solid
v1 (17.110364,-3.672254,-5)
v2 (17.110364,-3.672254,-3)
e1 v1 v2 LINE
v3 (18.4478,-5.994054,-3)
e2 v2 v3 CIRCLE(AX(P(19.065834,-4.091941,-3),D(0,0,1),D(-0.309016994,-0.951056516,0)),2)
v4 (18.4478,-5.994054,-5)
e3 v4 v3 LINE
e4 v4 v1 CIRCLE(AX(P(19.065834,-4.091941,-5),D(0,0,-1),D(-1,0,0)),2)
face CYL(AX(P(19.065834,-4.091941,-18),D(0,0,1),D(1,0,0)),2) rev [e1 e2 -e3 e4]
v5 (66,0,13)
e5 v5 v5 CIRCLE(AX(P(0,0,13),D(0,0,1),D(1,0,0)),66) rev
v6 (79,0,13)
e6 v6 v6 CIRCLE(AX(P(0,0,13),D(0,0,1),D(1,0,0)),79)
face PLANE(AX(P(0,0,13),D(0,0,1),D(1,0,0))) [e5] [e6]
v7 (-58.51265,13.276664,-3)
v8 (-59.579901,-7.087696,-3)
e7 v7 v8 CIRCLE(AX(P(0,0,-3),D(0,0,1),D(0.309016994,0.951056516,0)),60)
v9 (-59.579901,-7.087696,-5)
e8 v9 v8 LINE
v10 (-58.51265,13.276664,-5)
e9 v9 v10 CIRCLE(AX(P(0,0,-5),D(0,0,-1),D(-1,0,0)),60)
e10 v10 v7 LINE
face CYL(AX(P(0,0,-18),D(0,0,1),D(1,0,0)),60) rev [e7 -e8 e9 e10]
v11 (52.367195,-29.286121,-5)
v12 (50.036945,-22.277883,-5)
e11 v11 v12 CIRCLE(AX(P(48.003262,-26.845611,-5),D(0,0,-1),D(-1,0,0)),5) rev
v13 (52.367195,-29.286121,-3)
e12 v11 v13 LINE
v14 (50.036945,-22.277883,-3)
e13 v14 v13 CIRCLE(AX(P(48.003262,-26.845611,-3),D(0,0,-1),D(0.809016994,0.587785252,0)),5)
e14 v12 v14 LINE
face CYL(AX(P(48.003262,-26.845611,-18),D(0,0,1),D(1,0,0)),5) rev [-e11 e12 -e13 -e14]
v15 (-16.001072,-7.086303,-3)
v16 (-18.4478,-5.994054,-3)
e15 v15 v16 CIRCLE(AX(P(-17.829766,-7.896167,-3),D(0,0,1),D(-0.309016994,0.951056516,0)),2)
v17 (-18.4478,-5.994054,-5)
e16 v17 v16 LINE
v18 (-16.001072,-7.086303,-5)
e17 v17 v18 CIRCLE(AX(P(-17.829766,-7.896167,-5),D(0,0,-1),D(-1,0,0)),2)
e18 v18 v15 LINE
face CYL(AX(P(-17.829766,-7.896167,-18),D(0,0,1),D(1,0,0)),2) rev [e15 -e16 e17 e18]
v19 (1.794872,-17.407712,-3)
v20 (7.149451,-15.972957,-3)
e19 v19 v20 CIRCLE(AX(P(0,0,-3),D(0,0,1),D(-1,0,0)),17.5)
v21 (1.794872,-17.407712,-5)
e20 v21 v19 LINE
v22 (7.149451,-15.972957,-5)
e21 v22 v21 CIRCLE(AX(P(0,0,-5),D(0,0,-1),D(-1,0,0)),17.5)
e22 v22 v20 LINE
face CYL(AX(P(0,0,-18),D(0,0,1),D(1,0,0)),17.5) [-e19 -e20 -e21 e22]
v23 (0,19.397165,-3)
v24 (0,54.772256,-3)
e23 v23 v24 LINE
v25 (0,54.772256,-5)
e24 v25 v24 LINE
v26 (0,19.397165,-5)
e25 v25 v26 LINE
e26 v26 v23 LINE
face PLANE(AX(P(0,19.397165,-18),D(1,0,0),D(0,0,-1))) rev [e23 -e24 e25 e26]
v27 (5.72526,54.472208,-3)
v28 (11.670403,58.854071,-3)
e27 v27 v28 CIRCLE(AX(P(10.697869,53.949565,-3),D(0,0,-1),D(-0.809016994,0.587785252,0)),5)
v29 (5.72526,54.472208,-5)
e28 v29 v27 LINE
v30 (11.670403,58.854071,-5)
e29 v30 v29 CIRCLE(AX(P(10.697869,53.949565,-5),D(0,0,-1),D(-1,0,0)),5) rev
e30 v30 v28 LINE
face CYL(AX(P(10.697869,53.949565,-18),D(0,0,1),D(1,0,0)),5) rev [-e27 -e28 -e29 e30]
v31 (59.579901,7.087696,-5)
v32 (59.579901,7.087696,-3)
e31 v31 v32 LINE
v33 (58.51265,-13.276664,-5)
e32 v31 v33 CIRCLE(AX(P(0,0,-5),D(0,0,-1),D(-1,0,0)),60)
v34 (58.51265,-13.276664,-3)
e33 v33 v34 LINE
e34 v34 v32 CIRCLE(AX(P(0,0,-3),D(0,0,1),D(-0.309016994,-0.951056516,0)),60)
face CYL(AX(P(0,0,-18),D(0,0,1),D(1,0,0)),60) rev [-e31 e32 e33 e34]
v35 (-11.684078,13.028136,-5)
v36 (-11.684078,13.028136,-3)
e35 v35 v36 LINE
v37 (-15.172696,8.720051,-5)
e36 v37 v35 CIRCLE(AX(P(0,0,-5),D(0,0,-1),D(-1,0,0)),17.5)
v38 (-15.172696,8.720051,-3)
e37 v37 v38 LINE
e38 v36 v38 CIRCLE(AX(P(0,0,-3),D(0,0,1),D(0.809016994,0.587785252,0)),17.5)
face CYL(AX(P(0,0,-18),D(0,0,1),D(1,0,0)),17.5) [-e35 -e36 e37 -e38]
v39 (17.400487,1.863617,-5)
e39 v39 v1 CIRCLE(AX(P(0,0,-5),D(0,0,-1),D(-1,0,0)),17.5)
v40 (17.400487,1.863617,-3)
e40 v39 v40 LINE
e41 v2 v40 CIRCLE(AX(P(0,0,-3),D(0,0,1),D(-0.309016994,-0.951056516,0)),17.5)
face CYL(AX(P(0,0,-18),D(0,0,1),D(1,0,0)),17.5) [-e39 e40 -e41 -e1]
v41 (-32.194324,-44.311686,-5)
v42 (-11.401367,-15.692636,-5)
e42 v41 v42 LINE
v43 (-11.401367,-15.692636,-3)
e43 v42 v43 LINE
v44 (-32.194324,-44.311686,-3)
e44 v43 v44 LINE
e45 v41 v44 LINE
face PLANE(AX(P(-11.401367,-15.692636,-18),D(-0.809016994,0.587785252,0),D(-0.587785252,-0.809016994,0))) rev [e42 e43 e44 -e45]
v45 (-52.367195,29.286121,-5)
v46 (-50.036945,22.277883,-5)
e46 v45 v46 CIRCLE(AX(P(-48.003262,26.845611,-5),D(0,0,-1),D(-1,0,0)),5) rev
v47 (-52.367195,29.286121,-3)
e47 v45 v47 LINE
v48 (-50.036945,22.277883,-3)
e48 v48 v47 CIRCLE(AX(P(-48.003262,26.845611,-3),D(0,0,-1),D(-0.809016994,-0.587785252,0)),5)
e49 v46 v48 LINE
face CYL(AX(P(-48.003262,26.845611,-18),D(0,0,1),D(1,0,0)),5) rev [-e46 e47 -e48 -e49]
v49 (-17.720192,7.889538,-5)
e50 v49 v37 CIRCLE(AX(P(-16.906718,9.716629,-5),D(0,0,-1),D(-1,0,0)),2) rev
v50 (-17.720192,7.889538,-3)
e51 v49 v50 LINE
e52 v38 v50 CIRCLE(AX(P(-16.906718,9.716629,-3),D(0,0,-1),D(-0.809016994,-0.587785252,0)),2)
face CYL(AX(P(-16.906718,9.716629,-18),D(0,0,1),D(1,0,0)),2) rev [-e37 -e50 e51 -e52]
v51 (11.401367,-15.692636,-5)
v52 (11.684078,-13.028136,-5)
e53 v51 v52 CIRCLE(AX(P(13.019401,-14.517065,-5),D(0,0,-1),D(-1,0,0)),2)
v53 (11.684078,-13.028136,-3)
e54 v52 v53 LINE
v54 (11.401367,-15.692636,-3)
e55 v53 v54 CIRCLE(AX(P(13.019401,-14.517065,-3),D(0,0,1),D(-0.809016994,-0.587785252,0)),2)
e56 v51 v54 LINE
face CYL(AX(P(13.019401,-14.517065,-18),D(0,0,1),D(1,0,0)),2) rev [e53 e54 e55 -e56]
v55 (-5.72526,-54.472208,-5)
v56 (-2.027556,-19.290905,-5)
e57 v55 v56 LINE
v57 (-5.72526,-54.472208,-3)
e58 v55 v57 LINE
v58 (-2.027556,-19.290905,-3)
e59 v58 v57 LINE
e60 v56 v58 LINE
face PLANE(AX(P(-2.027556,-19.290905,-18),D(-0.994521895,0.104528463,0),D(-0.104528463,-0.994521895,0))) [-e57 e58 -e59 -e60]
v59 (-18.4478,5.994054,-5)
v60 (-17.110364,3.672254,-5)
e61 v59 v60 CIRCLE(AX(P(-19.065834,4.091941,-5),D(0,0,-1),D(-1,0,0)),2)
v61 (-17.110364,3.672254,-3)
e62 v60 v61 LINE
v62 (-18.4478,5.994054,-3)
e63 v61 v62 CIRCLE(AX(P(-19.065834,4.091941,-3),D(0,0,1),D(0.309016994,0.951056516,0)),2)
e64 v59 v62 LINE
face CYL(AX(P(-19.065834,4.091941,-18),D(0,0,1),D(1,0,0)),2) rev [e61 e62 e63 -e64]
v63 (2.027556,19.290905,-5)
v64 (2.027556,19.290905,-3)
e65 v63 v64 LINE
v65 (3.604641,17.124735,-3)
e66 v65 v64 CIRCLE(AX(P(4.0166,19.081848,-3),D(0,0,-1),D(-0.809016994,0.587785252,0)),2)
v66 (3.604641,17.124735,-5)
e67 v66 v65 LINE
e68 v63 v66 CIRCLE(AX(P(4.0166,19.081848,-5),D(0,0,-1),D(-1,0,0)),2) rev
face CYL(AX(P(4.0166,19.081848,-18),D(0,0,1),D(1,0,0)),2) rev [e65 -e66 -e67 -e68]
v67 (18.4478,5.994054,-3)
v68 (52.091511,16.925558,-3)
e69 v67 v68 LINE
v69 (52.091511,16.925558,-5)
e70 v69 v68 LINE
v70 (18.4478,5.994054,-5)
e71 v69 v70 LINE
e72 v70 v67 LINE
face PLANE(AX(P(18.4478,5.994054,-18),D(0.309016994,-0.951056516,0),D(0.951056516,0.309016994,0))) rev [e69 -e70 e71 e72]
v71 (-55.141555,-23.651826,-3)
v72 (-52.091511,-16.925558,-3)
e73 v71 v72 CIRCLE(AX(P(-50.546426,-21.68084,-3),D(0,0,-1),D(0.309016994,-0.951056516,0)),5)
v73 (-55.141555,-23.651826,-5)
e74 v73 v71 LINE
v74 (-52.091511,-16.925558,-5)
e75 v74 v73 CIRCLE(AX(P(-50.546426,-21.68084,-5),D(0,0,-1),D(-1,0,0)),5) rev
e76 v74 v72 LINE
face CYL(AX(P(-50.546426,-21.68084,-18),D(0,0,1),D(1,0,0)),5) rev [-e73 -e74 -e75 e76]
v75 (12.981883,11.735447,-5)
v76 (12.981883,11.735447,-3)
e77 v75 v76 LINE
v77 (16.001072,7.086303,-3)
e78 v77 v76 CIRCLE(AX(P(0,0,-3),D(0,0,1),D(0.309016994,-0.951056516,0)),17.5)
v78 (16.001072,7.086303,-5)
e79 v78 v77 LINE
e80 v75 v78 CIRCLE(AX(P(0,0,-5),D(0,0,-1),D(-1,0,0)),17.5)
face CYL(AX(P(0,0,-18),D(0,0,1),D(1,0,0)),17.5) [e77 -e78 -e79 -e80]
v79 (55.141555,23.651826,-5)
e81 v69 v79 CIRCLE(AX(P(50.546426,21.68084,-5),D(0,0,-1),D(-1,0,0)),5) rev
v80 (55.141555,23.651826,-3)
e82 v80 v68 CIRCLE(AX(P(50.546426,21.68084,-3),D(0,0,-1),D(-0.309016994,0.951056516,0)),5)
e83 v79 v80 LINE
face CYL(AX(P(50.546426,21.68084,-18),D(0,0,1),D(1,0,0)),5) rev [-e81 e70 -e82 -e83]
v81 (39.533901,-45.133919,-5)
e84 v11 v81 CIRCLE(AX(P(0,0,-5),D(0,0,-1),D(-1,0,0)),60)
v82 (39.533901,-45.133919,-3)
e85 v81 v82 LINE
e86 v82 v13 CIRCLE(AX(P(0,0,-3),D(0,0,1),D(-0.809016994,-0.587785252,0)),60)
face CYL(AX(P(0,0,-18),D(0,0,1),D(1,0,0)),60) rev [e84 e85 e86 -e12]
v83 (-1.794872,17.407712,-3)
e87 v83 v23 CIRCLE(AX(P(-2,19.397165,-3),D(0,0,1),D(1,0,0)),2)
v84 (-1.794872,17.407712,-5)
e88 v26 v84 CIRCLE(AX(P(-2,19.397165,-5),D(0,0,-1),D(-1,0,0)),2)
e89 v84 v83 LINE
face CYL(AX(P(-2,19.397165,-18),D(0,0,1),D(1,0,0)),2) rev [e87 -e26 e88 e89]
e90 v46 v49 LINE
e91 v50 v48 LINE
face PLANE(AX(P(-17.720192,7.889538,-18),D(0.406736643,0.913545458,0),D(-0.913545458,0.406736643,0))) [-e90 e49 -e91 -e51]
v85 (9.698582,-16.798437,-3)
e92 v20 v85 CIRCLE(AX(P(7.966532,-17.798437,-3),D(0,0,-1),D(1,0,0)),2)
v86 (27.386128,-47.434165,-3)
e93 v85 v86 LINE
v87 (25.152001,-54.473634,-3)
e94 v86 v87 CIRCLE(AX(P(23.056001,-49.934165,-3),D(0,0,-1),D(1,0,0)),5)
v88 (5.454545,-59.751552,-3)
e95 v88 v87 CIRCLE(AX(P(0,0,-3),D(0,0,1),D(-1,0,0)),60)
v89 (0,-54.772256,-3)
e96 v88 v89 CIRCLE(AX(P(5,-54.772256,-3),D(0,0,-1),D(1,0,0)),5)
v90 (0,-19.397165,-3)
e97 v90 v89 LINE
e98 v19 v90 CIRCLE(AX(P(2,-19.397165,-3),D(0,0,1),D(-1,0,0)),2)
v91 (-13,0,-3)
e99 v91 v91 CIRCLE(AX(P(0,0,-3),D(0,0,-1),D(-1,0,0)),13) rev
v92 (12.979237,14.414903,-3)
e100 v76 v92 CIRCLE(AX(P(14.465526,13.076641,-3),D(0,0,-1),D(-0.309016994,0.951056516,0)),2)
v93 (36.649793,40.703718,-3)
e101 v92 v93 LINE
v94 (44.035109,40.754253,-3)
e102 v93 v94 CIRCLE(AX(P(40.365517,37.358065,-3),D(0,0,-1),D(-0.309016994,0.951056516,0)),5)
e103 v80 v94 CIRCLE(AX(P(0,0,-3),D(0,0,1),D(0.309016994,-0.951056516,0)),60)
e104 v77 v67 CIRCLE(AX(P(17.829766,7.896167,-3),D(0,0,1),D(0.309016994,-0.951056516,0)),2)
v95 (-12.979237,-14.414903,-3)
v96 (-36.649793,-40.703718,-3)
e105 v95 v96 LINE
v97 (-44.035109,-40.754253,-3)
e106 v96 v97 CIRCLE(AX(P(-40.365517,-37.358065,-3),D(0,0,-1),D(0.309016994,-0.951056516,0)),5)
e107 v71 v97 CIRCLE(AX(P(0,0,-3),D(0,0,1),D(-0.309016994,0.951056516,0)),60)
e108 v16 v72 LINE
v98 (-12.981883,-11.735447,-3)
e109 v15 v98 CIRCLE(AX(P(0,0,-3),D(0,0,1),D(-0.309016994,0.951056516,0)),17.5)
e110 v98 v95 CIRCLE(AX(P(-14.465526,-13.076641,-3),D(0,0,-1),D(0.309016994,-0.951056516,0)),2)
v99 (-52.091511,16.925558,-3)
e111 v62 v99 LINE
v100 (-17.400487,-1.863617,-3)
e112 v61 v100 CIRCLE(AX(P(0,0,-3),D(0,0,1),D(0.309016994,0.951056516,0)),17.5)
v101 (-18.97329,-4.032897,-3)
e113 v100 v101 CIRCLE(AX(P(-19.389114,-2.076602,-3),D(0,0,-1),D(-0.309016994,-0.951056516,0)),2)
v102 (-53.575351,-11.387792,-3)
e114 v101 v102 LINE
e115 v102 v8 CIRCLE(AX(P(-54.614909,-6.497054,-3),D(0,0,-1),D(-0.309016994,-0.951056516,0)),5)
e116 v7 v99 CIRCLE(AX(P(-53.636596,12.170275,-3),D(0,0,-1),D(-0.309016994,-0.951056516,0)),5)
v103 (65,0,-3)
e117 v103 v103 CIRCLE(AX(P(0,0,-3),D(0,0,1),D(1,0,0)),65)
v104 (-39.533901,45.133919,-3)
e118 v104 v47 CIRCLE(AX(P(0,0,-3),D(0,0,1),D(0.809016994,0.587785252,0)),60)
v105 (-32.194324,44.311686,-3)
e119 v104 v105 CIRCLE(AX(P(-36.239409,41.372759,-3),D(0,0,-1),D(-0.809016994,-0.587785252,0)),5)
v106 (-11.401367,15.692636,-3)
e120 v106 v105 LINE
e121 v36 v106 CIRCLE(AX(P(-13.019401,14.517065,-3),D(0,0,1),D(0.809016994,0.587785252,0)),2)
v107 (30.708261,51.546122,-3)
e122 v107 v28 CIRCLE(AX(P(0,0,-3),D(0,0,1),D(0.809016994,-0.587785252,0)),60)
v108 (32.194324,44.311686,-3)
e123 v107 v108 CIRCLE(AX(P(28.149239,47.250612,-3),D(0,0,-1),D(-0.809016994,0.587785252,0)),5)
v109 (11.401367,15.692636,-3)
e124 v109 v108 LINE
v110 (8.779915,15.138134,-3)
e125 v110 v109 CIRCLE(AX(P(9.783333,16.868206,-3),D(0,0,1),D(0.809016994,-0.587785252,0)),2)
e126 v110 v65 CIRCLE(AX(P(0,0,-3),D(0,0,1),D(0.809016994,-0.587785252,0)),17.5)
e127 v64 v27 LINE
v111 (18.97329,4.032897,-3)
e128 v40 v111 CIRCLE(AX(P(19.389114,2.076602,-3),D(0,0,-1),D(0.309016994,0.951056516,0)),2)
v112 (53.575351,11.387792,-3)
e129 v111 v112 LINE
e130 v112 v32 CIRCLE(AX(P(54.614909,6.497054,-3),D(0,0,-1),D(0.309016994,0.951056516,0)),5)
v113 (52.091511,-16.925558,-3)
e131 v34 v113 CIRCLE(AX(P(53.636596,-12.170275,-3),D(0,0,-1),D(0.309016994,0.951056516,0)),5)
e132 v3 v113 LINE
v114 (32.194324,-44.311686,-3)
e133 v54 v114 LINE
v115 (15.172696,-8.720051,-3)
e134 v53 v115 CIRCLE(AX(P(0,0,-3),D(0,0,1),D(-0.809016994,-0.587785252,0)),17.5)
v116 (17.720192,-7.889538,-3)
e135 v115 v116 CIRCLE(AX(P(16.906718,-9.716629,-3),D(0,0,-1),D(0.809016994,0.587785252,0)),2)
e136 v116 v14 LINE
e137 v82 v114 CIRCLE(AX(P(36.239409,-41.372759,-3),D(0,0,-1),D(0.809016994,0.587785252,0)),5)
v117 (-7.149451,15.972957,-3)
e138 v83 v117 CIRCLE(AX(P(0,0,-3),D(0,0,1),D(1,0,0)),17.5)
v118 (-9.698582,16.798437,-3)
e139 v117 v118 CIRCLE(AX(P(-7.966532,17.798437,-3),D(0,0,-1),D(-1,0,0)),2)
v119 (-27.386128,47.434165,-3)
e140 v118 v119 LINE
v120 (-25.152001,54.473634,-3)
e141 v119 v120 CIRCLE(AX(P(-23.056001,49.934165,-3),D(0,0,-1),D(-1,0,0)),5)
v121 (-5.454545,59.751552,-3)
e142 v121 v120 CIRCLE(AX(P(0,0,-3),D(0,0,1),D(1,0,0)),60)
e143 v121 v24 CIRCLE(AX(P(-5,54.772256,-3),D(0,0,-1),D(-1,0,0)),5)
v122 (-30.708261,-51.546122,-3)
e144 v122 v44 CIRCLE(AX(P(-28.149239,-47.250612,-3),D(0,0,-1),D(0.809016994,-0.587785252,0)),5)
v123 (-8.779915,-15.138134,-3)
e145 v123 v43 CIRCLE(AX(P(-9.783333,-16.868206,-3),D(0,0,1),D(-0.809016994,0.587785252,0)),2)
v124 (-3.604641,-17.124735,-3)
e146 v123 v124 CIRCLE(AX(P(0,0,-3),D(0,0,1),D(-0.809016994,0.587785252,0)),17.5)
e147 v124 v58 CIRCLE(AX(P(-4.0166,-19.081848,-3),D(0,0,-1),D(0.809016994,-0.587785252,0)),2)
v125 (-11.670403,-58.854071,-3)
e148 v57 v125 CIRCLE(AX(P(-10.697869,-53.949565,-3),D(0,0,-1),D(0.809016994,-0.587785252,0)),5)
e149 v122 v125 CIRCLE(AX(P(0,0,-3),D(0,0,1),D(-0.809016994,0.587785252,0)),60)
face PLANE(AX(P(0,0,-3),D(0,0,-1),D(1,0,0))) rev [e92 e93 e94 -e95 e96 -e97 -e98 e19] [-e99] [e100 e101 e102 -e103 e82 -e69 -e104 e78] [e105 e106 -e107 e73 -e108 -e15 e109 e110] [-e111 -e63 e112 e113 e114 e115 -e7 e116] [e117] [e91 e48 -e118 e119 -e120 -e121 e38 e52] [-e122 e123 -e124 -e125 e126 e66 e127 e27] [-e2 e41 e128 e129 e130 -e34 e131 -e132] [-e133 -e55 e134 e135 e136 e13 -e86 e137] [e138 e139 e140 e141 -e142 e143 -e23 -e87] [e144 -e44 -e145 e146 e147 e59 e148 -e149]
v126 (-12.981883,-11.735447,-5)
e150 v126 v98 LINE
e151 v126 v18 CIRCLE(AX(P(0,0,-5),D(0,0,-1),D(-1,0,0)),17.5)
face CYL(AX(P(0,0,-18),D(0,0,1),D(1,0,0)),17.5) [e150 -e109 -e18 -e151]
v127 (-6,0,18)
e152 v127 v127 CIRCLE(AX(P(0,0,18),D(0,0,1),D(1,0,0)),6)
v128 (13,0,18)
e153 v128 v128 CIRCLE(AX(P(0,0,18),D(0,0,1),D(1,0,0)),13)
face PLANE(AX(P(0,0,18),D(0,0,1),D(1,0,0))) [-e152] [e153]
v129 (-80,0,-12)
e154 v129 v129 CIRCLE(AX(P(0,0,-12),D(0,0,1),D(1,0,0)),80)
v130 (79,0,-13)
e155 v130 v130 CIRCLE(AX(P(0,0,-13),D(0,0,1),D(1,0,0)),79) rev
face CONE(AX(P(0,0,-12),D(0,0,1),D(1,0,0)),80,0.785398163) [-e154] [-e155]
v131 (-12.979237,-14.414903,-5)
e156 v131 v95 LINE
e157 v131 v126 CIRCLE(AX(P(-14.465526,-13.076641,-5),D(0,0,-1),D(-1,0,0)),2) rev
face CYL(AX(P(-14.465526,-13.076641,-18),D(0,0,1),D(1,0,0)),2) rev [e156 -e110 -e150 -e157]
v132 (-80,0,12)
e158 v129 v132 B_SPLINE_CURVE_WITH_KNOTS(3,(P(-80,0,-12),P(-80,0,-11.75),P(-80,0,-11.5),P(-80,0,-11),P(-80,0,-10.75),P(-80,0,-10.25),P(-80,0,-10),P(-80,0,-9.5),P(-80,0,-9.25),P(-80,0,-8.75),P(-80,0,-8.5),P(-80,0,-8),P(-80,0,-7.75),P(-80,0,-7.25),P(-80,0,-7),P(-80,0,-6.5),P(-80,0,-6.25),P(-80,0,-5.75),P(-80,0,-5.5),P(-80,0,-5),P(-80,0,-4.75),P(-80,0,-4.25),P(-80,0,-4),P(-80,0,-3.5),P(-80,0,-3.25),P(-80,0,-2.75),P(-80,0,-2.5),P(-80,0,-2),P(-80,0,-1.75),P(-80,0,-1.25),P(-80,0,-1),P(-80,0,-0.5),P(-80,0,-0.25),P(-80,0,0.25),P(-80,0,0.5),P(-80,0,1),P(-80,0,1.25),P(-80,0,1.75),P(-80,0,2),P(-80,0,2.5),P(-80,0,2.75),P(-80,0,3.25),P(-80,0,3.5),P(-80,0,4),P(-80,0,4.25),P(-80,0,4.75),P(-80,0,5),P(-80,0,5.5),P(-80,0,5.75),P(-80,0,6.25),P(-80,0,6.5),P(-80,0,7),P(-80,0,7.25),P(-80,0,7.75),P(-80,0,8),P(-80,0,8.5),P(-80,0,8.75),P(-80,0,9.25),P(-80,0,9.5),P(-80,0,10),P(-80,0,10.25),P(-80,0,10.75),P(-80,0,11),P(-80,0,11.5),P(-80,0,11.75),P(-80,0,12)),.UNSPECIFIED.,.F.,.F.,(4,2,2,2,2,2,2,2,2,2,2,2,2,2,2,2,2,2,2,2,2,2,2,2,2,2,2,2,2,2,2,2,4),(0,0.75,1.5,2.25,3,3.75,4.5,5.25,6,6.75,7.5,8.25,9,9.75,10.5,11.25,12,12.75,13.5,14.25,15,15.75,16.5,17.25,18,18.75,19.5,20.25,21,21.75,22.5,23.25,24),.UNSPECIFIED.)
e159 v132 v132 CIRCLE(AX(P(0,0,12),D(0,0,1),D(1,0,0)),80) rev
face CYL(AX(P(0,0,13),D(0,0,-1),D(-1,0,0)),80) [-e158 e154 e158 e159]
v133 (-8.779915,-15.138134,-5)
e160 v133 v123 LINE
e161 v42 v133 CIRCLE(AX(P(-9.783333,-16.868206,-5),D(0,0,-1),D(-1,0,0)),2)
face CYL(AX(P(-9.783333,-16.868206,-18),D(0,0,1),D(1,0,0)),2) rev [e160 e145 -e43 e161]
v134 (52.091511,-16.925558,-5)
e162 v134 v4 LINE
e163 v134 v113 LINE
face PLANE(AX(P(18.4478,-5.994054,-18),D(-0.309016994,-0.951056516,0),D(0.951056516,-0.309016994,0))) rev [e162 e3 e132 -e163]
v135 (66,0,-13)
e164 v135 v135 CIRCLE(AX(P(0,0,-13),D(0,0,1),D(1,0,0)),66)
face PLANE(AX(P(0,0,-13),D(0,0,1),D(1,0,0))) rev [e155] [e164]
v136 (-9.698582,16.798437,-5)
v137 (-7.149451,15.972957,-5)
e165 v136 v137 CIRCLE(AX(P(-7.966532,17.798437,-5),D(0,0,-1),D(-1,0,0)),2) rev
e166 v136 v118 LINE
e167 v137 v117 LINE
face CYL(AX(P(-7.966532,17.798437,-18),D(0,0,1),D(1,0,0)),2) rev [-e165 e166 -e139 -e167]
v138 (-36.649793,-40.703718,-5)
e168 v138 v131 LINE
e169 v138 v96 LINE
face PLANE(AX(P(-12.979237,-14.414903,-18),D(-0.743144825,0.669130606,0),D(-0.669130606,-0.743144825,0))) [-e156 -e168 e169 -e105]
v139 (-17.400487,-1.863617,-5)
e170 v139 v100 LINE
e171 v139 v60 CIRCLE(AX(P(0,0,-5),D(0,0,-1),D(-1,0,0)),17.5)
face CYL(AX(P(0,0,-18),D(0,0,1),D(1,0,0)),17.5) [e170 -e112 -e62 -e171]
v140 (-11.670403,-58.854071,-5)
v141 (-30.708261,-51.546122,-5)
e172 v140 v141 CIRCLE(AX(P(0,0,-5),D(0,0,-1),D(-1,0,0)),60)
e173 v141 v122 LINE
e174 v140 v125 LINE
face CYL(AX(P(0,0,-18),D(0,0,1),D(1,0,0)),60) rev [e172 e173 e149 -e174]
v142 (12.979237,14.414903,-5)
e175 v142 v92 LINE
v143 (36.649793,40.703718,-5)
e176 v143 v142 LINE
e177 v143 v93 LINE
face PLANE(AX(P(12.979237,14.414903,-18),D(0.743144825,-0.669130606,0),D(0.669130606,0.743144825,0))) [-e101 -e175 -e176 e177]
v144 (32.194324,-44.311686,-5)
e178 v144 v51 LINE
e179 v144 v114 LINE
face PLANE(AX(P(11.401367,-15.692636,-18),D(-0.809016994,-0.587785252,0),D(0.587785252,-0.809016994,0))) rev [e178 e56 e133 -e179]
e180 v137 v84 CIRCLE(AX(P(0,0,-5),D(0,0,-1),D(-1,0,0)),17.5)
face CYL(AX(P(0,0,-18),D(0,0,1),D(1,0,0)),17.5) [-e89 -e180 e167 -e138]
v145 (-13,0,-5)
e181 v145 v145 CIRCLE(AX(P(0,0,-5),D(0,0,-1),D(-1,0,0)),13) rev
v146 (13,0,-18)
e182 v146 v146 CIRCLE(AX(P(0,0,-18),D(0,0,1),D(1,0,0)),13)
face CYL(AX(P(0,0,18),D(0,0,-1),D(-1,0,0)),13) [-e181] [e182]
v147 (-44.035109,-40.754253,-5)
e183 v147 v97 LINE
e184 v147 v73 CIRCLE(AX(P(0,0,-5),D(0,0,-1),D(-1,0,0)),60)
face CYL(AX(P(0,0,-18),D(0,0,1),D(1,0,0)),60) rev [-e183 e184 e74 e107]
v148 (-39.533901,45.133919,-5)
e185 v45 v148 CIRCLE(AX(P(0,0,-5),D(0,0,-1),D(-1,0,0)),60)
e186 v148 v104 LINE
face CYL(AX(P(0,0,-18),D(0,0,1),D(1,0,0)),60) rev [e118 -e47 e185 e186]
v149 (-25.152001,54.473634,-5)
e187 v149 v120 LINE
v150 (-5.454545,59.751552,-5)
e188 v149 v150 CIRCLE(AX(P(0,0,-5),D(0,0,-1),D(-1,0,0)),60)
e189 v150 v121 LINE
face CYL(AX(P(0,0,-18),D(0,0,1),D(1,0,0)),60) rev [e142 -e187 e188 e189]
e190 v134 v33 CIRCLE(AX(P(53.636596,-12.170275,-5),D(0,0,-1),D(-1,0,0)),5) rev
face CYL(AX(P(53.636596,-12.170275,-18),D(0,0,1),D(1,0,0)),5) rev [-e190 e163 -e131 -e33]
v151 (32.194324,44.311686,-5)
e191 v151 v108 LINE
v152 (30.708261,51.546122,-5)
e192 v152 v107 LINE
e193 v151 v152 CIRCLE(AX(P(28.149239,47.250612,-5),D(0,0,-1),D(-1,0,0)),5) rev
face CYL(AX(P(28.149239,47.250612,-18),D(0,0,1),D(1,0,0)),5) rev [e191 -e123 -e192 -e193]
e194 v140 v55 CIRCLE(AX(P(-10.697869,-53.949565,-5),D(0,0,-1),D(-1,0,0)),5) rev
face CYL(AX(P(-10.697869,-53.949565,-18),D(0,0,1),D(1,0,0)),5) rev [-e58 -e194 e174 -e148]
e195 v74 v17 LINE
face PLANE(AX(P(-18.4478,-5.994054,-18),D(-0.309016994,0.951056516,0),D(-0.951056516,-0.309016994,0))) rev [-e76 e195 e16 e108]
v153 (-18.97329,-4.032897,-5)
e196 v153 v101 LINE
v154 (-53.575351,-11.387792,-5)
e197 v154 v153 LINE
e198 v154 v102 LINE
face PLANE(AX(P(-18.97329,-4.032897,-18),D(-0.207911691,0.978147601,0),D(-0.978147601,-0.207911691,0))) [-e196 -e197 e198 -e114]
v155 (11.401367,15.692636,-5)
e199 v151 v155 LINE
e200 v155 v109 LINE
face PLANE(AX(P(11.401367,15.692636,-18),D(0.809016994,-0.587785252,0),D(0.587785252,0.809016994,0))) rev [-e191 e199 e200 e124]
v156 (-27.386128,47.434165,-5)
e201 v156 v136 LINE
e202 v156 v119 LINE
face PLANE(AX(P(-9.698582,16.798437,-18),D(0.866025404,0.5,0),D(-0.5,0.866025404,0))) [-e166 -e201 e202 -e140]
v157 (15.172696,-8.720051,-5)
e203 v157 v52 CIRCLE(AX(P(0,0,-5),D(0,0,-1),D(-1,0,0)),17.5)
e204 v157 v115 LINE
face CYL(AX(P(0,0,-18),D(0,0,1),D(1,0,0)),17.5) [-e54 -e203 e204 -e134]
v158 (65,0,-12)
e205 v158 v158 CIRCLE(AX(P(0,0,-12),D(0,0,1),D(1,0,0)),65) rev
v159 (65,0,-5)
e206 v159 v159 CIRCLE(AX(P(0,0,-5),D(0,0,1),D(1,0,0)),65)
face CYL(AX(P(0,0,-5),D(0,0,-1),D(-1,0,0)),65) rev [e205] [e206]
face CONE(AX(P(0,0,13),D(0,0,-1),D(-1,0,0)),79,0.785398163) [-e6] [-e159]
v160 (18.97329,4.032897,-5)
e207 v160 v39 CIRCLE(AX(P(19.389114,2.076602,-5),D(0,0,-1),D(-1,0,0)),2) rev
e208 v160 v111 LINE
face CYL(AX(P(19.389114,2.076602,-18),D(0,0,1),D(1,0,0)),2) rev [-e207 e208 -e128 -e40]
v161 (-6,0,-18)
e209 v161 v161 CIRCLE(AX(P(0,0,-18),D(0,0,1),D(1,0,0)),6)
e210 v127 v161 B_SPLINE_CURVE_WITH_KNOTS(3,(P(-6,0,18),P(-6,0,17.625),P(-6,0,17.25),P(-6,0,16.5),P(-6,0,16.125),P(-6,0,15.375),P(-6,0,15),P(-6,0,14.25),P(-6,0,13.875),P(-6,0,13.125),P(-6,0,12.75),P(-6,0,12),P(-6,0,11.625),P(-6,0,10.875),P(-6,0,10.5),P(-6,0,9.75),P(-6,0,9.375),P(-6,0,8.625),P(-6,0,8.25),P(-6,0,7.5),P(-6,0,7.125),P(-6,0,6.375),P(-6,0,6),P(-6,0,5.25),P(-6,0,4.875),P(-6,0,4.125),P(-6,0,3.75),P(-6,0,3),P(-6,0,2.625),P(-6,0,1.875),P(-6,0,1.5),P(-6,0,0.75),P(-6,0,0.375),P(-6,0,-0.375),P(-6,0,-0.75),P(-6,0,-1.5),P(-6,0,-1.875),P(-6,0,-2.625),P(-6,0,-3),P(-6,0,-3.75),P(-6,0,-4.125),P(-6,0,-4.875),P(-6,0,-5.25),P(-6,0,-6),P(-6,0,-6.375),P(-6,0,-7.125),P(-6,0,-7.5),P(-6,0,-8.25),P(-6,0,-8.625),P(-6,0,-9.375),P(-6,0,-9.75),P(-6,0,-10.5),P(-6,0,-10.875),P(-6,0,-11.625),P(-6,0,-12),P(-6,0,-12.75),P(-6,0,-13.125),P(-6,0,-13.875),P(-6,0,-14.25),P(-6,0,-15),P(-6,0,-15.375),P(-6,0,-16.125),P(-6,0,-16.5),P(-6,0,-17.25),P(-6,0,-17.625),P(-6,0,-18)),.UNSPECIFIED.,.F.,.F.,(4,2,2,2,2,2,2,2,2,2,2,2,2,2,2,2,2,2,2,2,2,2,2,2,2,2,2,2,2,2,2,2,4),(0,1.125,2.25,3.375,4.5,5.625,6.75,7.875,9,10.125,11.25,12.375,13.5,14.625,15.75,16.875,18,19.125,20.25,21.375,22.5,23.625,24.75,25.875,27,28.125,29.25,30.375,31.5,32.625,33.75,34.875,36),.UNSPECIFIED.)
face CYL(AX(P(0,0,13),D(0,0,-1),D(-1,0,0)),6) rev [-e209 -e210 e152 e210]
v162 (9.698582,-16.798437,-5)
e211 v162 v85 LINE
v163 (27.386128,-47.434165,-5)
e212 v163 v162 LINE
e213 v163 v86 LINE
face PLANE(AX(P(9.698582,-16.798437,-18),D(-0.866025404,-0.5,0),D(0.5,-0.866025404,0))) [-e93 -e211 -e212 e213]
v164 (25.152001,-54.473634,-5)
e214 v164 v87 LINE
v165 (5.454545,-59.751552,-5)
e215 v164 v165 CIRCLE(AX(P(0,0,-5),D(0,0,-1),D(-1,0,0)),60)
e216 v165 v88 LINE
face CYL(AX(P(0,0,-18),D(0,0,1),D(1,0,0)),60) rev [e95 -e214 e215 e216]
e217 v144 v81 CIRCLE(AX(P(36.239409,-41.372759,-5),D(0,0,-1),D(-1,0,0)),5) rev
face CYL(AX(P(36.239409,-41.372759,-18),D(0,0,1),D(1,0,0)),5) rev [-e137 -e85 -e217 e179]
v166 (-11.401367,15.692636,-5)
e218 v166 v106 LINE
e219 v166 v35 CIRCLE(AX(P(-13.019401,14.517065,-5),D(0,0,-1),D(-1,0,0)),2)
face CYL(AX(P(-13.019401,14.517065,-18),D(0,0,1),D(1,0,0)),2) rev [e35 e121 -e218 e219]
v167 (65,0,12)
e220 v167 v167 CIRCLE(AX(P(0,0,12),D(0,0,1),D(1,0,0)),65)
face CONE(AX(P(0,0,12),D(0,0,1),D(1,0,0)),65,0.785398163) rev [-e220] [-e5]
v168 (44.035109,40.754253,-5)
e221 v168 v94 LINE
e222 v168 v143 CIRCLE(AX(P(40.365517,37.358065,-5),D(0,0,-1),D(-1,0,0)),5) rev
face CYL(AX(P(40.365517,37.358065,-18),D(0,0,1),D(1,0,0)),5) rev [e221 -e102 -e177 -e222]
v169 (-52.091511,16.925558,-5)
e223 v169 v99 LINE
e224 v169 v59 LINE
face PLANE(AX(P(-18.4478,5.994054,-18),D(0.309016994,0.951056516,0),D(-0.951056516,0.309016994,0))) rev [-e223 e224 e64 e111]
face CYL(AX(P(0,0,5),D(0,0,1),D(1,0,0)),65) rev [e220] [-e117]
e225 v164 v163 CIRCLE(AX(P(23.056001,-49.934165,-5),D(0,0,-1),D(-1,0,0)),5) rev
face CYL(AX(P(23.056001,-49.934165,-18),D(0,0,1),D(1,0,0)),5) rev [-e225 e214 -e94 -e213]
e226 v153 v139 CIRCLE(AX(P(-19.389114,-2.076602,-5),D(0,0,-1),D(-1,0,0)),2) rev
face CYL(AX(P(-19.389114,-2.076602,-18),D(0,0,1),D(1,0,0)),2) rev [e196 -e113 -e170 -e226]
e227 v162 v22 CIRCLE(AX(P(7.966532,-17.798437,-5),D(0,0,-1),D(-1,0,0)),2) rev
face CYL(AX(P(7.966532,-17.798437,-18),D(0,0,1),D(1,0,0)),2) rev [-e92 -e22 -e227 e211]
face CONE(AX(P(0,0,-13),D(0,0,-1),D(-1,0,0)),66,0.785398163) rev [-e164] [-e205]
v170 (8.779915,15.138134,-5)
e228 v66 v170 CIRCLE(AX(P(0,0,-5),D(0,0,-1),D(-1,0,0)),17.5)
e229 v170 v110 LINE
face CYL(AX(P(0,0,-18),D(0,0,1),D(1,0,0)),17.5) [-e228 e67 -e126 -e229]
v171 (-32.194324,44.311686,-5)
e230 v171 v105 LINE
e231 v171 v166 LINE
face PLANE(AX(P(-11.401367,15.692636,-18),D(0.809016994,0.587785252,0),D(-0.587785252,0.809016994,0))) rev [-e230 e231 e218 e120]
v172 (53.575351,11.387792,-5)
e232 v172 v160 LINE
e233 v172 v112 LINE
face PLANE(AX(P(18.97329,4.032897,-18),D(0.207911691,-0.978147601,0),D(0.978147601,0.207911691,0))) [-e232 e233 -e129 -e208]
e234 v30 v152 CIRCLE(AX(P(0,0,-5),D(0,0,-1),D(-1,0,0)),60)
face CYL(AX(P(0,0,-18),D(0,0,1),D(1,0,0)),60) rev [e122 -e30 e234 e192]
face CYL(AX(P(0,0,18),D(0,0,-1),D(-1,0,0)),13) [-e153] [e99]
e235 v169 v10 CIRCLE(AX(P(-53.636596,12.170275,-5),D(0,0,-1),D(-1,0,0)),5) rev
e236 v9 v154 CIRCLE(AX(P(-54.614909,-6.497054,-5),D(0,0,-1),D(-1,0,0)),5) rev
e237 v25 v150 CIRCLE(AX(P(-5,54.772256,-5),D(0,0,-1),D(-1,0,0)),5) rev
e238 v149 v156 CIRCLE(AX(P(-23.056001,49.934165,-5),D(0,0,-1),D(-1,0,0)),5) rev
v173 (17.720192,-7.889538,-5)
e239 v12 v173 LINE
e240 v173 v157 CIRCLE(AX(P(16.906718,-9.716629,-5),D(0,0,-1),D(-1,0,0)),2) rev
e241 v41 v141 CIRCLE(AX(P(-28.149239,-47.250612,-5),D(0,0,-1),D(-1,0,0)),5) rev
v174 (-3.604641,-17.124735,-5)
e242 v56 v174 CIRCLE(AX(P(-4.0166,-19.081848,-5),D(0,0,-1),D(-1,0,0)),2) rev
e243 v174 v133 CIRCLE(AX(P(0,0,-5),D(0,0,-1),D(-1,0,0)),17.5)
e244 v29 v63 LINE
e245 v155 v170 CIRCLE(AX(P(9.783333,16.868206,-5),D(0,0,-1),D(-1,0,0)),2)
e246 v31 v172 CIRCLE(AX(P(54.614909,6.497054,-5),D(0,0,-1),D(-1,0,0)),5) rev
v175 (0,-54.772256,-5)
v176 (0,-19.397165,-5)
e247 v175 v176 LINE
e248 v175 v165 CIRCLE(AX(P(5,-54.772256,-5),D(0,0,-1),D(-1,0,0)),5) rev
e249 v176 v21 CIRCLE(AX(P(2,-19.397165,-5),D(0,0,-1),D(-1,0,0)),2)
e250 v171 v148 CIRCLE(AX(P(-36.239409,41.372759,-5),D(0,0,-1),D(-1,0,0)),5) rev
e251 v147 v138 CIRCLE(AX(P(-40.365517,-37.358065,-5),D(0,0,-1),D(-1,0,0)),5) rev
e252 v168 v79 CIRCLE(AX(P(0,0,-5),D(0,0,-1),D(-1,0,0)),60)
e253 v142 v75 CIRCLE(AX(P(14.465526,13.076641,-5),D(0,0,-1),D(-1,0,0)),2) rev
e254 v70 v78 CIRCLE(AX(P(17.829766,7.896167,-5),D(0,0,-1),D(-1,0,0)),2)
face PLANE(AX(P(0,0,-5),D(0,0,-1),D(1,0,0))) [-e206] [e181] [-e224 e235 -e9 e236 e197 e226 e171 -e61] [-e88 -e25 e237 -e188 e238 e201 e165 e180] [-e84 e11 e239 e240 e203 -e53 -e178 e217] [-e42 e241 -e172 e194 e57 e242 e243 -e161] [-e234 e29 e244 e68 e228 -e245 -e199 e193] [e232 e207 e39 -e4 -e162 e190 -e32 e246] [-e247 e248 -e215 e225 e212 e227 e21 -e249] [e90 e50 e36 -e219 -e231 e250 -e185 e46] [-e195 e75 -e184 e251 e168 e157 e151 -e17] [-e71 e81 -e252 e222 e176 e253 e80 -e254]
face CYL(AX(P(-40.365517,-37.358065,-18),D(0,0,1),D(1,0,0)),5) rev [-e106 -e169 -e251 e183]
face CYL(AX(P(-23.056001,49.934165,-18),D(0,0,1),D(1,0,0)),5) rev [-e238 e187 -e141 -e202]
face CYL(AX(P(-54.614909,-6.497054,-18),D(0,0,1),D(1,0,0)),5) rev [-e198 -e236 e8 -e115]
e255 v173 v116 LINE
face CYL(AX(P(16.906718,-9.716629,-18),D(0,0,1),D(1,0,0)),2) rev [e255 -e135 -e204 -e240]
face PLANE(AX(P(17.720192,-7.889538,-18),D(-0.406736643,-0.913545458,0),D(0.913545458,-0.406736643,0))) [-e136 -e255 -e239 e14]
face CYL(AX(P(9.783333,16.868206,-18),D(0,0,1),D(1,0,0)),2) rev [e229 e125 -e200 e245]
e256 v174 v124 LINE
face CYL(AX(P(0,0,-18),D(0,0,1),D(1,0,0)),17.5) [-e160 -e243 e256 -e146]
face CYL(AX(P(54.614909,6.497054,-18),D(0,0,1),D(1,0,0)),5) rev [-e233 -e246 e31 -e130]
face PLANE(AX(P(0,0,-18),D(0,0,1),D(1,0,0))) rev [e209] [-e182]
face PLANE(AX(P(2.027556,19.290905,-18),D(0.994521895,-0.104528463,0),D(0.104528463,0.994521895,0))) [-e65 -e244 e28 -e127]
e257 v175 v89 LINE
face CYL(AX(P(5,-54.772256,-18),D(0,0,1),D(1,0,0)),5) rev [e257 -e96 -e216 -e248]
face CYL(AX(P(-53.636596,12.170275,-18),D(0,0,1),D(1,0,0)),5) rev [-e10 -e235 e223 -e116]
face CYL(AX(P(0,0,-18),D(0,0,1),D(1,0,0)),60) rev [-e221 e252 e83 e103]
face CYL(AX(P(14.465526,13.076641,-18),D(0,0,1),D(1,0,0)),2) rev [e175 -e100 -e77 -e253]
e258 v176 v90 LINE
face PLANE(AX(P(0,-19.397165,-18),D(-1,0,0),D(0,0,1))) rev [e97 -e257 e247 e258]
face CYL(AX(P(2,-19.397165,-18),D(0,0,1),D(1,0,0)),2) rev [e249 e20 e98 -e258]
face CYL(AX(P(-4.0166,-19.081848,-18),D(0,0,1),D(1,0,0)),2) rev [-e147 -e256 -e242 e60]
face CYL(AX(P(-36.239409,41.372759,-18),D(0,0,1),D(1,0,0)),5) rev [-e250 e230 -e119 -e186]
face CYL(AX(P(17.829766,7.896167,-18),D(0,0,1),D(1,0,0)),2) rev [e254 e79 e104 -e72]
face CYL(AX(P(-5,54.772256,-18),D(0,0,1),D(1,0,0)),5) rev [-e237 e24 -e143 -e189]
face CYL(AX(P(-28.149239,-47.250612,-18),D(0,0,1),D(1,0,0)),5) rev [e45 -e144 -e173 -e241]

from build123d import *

# Parameters (mm, degrees)
SKETCH1_R             = 80
SKETCH1_R_2           = 6
BOSS_EXTRUDE1_DEPTH   = 13
SKETCH2_R             = 65
CUT_EXTRUDE1_DEPTH    = 8
MIRROR1_START         = -13
MIRROR1_OUTLINE_R     = 65
MIRROR1_OUTLINE_R_2   = 6
MIRROR1_DEPTH         = 8
MIRROR1_START_2       = -3
MIRROR1_2_OUTLINE_R   = 65
MIRROR1_2_OUTLINE_R_2 = 6
MIRROR1_2_DEPTH       = 8
SKETCH3_R             = 13
SKETCH3_R_2           = 6
BOSS_EXTRUDE2_DEPTH   = 18
CHAMFER1_SIZE         = 1
CUT_EXTRUDE2_DEPTH    = 116.06954419
CIRPATTERN1_COUNT     = 10


# Read off the part's stored shape, not the designer's step: Mirror1
with BuildPart() as part:
    # Sketch1 → Boss-Extrude1 (new, symmetric)
    with BuildSketch(Plane.XY):
        with Locations(Location((0, 0, 0), (0, 0, 180))):
            Circle(SKETCH1_R)
        with Locations(Location((0, 0, 0), (0, 0, 180))):
            Circle(SKETCH1_R_2, mode=Mode.SUBTRACT)
    extrude(amount=BOSS_EXTRUDE1_DEPTH, both=True)

    # Sketch2 → Cut-Extrude1 (cut)
    with BuildSketch(Plane.XY.offset(13)):
        Circle(SKETCH2_R)
    extrude(amount=-CUT_EXTRUDE1_DEPTH, mode=Mode.SUBTRACT)

    # Mirror1 outline → Mirror1 (cut)
    with BuildSketch(Plane.XY.offset(MIRROR1_START)):
        Circle(MIRROR1_OUTLINE_R)
        Circle(MIRROR1_OUTLINE_R_2, mode=Mode.SUBTRACT)
    extrude(amount=MIRROR1_DEPTH, mode=Mode.SUBTRACT)

    # Mirror1 2 outline → Mirror1 2 (cut)
    with BuildSketch(Plane.XY.offset(MIRROR1_START_2)):
        Circle(MIRROR1_2_OUTLINE_R)
        Circle(MIRROR1_2_OUTLINE_R_2, mode=Mode.SUBTRACT)
    extrude(amount=MIRROR1_2_DEPTH, mode=Mode.SUBTRACT)

    # Sketch3 → Boss-Extrude2 (add, symmetric)
    with BuildSketch(Plane.XY):
        with Locations(Location((0, 0, 0), (0, 0, 180))):
            Circle(SKETCH3_R)
        with Locations(Location((0, 0, 0), (0, 0, 180))):
            Circle(SKETCH3_R_2, mode=Mode.SUBTRACT)
    extrude(amount=BOSS_EXTRUDE2_DEPTH, both=True)

    # Chamfer1
    chamfer1_edges = [part.edges().sort_by_distance(p)[0] for p in [
        (-65, 0, 13),
        (-65, 0, -13),
        (80, 0, -13),
        (80, 0, 13),
    ]]
    chamfer(chamfer1_edges, length=CHAMFER1_SIZE)

    # Sketch4 → Cut-Extrude2 (cut, through all)
    with BuildSketch(Plane.XY.offset(-3)):
        with BuildLine():
            Line((0, 19.397164741), (0, 54.772255751))
            ThreePointArc((0, 54.772255751), (-1.629000688, 58.46500048), (-5.454545455, 59.751551728))
            ThreePointArc((-5.454545455, 59.751551728), (-15.529142706, 57.955549577), (-25.152000934, 54.473634439))
            ThreePointArc((-25.152000934, 54.473634439), (-27.821744262, 51.446675992), (-27.386127875, 47.434164903))
            Line((-27.386127875, 47.434164903), (-9.698582371, 16.798437427))
            ThreePointArc((-9.698582371, 16.798437427), (-8.582686936, 15.895715021), (-7.149451403, 15.972956666))
            ThreePointArc((-7.149451403, 15.972956666), (-4.529333289, 16.90370196), (-1.794871795, 17.407711947))
            ThreePointArc((-1.794871795, 17.407711947), (-0.515032591, 18.057436487), (0, 19.397164741))
        make_face()
    cut_extrude2 = extrude(amount=-CUT_EXTRUDE2_DEPTH, mode=Mode.SUBTRACT)

    # CirPattern1: Cut-Extrude2 ×10 about axis
    cirpattern1_axis = Axis((0, 0, 0), (0, 0, 1))
    for i in range(1, CIRPATTERN1_COUNT):
        add(cut_extrude2.rotate(cirpattern1_axis, i * 360 / CIRPATTERN1_COUNT), mode=Mode.SUBTRACT)


solid = part.part
